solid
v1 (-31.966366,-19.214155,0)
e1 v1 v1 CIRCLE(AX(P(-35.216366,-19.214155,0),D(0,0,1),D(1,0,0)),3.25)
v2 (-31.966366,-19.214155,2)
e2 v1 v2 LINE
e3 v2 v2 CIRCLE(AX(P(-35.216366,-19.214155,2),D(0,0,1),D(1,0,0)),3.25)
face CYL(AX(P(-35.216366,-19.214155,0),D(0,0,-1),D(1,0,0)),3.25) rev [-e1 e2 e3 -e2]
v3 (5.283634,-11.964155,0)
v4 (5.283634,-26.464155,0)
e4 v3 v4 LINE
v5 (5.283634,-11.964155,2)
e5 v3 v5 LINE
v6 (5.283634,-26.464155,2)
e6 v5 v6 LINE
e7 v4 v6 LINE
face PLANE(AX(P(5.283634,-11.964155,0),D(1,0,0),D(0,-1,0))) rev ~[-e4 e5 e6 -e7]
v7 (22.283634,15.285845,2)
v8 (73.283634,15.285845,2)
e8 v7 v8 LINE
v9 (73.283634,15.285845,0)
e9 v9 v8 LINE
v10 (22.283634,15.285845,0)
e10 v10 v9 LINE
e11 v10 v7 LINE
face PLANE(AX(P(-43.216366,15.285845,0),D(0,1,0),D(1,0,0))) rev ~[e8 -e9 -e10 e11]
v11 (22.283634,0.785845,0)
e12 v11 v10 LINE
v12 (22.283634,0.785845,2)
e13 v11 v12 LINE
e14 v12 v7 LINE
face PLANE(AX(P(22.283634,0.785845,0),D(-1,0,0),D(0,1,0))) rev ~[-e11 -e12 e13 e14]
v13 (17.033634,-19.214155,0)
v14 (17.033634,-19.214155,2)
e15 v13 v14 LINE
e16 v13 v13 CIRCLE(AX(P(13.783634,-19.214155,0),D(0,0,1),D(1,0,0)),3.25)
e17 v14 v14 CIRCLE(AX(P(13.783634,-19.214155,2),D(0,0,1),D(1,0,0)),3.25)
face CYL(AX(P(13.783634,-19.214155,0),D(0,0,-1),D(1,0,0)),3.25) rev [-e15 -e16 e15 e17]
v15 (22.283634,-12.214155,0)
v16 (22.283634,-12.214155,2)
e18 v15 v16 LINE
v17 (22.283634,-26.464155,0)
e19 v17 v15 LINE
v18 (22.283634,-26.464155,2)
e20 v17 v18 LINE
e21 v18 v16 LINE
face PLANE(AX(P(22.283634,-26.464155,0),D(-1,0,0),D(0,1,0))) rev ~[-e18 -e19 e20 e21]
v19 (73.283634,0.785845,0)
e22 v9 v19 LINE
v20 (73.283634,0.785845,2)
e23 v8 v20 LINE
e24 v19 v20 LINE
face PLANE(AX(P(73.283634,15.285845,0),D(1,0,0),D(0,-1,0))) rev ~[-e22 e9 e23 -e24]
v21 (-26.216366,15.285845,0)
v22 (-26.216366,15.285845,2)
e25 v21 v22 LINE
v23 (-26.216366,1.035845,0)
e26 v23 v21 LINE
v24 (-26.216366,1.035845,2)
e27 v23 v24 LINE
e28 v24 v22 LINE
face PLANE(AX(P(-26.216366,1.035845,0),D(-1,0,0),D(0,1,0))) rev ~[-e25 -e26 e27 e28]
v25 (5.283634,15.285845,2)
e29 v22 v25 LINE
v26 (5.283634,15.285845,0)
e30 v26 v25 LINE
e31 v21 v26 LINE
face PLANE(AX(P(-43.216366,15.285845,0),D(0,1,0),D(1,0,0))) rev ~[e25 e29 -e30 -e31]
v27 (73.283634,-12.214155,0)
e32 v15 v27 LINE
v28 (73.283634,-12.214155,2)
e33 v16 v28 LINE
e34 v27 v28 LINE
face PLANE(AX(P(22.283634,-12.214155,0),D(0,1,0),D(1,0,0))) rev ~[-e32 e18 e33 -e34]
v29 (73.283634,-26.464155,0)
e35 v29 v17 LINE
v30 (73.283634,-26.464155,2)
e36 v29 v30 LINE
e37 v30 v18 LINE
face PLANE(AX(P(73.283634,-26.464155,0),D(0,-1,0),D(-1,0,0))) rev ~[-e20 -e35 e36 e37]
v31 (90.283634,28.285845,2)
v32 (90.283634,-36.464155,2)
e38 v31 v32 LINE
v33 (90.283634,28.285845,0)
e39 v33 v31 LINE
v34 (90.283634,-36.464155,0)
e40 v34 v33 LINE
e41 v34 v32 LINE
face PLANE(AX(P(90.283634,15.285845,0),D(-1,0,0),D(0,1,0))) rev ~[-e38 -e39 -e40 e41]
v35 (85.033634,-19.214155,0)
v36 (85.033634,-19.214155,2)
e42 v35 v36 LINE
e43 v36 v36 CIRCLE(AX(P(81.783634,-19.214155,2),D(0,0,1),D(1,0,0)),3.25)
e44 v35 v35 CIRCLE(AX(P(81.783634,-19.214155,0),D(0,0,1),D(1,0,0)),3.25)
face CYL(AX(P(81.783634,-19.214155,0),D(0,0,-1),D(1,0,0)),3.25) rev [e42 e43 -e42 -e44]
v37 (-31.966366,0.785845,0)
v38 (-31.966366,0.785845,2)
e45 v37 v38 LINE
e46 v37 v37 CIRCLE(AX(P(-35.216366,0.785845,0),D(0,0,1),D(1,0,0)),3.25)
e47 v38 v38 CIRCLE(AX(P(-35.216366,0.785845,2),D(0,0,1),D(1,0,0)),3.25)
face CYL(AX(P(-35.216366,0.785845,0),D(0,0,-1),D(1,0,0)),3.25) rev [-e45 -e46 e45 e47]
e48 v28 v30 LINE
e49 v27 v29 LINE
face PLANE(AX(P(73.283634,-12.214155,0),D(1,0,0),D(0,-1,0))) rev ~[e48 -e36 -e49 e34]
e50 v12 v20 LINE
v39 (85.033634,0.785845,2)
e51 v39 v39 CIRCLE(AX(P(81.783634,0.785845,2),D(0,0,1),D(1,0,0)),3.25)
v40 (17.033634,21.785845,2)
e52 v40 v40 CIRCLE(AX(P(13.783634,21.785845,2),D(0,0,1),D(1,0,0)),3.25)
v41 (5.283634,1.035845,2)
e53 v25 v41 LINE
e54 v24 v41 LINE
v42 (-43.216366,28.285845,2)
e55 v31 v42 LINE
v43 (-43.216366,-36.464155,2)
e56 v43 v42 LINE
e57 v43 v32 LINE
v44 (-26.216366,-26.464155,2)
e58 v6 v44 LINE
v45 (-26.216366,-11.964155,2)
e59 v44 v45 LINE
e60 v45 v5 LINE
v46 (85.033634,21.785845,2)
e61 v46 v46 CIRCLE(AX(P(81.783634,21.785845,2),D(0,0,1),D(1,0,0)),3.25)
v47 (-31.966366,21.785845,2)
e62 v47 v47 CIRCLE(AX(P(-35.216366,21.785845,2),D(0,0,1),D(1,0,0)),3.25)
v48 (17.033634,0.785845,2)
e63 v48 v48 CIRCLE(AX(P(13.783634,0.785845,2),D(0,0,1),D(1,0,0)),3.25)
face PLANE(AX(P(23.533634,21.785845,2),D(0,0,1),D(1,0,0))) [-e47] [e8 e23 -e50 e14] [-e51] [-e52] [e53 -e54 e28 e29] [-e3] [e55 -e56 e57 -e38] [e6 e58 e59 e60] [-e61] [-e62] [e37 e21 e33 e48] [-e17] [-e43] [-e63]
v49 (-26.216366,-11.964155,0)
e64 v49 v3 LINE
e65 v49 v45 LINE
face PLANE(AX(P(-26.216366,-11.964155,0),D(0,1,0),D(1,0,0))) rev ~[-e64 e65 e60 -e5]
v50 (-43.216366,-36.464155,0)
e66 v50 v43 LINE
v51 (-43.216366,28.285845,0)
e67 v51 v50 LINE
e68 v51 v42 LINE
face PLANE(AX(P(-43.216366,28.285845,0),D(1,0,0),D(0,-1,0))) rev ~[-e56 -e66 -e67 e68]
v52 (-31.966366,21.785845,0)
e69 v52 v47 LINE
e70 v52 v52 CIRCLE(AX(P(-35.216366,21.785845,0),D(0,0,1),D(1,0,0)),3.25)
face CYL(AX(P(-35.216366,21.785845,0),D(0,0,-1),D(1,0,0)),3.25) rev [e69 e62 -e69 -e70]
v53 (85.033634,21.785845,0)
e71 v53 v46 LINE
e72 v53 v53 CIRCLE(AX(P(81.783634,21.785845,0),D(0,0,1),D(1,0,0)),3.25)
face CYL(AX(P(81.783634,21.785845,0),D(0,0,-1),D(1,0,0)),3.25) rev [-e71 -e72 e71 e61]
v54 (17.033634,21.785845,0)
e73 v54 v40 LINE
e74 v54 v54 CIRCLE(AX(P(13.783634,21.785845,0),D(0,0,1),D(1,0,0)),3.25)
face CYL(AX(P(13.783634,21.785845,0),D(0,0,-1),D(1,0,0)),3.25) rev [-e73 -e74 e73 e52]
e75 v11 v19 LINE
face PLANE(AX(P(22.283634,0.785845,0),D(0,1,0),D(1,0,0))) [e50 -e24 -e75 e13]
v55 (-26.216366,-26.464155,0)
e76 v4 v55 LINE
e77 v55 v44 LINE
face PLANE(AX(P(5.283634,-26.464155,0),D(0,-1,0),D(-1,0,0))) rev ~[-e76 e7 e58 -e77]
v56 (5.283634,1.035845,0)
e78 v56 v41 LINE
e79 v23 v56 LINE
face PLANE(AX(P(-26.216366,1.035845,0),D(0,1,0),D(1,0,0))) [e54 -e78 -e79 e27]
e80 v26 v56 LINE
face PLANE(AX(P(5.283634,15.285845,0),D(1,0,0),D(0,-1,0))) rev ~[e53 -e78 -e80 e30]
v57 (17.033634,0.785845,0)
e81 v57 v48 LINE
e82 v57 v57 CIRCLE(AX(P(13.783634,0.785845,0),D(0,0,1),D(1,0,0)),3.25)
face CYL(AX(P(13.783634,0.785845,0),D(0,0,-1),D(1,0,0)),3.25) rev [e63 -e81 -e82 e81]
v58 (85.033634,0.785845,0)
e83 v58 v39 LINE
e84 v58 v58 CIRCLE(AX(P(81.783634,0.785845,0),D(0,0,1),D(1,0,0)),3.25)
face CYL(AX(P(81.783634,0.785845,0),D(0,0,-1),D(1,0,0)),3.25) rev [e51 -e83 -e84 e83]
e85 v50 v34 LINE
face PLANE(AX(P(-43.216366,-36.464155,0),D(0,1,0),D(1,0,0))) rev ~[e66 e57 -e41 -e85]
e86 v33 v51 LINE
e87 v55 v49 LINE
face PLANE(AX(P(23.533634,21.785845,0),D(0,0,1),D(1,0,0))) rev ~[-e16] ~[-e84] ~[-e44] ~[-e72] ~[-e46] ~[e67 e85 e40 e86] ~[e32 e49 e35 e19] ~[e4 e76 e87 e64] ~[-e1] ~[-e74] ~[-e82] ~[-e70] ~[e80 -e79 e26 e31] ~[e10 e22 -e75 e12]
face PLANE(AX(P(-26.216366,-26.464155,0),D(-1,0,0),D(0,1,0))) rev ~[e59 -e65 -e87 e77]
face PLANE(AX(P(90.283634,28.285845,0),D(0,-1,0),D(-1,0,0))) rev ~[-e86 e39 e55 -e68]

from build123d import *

# Parameters (mm, degrees)
F0_R     = 3.25
F0_W     = 31.5
F0_H     = 13
F0_W_2   = 51
F1_DEPTH = 2
F2_DEPTH = 2


# Not quite as in the source:
# - a feature names something its author has since deleted; it is built from what else it names


with BuildPart() as f1:
    # F0 (on Top) → F1 (new body)
    with BuildSketch(Plane.XY):
        Polygon((-26.2163661122, 15.2858447556), (-43.2163661122, 15.2858447556), (-43.2163661122, -26.4641552444), (-26.2163661122, -26.4641552444), (-26.2163661122, -11.9641552444), (-26.2163661122, 1.0358447556), align=None)
        with Locations((-35.2163661122, -19.2141552444)):
            Circle(F0_R, mode=Mode.SUBTRACT)
        with Locations((-35.2163661122, 0.7858447556)):
            Circle(F0_R, mode=Mode.SUBTRACT)
        Polygon((22.2836338878, 15.2858447556), (5.2836338878, 15.2858447556), (5.2836338878, 1.0358447556), (5.2836338878, -11.9641552444), (5.2836338878, -26.4641552444), (22.2836338878, -26.4641552444), (22.2836338878, -12.2141552444), (22.2836338878, 0.7858447556), align=None)
        with Locations((13.7836338878, -19.2141552444)):
            Circle(F0_R, mode=Mode.SUBTRACT)
        with Locations((13.7836338878, 0.7858447556)):
            Circle(F0_R, mode=Mode.SUBTRACT)
        Polygon((90.2836338878, -26.4641552444), (90.2836338878, 15.2858447556), (73.2836338878, 15.2858447556), (73.2836338878, 0.7858447556), (73.2836338878, -12.2141552444), (73.2836338878, -26.4641552444), align=None)
        with Locations((81.7836338878, -19.2141552444)):
            Circle(F0_R, mode=Mode.SUBTRACT)
        with Locations((81.7836338878, 0.7858447556)):
            Circle(F0_R, mode=Mode.SUBTRACT)
        Polygon((-26.2163661122, -26.4641552444), (-43.2163661122, -26.4641552444), (-43.2163661122, -36.4641552444), (90.2836338878, -36.4641552444), (90.2836338878, -26.4641552444), (73.2836338878, -26.4641552444), (22.2836338878, -26.4641552444), (5.2836338878, -26.4641552444), align=None)
        with Locations((-10.4663661122, -5.4641552444)):
            Rectangle(F0_W, F0_H)
        with Locations((47.7836338878, -5.7141552444)):
            Rectangle(F0_W_2, F0_H)
    extrude(amount=F1_DEPTH)

    # F0 (on Top) → F2 (join)
    with BuildSketch(Plane.XY):
        Polygon((90.2836338878, 28.2858447556), (-43.2163661122, 28.2858447556), (-43.2163661122, 15.2858447556), (-26.2163661122, 15.2858447556), (5.2836338878, 15.2858447556), (22.2836338878, 15.2858447556), (73.2836338878, 15.2858447556), (90.2836338878, 15.2858447556), align=None)
        with Locations((-35.2163661122, 21.7858447556)):
            Circle(F0_R, mode=Mode.SUBTRACT)
        with Locations((13.7836338878, 21.7858447556)):
            Circle(F0_R, mode=Mode.SUBTRACT)
        with Locations((81.7836338878, 21.7858447556)):
            Circle(F0_R, mode=Mode.SUBTRACT)
    extrude(amount=F2_DEPTH)


solid = f1.part
